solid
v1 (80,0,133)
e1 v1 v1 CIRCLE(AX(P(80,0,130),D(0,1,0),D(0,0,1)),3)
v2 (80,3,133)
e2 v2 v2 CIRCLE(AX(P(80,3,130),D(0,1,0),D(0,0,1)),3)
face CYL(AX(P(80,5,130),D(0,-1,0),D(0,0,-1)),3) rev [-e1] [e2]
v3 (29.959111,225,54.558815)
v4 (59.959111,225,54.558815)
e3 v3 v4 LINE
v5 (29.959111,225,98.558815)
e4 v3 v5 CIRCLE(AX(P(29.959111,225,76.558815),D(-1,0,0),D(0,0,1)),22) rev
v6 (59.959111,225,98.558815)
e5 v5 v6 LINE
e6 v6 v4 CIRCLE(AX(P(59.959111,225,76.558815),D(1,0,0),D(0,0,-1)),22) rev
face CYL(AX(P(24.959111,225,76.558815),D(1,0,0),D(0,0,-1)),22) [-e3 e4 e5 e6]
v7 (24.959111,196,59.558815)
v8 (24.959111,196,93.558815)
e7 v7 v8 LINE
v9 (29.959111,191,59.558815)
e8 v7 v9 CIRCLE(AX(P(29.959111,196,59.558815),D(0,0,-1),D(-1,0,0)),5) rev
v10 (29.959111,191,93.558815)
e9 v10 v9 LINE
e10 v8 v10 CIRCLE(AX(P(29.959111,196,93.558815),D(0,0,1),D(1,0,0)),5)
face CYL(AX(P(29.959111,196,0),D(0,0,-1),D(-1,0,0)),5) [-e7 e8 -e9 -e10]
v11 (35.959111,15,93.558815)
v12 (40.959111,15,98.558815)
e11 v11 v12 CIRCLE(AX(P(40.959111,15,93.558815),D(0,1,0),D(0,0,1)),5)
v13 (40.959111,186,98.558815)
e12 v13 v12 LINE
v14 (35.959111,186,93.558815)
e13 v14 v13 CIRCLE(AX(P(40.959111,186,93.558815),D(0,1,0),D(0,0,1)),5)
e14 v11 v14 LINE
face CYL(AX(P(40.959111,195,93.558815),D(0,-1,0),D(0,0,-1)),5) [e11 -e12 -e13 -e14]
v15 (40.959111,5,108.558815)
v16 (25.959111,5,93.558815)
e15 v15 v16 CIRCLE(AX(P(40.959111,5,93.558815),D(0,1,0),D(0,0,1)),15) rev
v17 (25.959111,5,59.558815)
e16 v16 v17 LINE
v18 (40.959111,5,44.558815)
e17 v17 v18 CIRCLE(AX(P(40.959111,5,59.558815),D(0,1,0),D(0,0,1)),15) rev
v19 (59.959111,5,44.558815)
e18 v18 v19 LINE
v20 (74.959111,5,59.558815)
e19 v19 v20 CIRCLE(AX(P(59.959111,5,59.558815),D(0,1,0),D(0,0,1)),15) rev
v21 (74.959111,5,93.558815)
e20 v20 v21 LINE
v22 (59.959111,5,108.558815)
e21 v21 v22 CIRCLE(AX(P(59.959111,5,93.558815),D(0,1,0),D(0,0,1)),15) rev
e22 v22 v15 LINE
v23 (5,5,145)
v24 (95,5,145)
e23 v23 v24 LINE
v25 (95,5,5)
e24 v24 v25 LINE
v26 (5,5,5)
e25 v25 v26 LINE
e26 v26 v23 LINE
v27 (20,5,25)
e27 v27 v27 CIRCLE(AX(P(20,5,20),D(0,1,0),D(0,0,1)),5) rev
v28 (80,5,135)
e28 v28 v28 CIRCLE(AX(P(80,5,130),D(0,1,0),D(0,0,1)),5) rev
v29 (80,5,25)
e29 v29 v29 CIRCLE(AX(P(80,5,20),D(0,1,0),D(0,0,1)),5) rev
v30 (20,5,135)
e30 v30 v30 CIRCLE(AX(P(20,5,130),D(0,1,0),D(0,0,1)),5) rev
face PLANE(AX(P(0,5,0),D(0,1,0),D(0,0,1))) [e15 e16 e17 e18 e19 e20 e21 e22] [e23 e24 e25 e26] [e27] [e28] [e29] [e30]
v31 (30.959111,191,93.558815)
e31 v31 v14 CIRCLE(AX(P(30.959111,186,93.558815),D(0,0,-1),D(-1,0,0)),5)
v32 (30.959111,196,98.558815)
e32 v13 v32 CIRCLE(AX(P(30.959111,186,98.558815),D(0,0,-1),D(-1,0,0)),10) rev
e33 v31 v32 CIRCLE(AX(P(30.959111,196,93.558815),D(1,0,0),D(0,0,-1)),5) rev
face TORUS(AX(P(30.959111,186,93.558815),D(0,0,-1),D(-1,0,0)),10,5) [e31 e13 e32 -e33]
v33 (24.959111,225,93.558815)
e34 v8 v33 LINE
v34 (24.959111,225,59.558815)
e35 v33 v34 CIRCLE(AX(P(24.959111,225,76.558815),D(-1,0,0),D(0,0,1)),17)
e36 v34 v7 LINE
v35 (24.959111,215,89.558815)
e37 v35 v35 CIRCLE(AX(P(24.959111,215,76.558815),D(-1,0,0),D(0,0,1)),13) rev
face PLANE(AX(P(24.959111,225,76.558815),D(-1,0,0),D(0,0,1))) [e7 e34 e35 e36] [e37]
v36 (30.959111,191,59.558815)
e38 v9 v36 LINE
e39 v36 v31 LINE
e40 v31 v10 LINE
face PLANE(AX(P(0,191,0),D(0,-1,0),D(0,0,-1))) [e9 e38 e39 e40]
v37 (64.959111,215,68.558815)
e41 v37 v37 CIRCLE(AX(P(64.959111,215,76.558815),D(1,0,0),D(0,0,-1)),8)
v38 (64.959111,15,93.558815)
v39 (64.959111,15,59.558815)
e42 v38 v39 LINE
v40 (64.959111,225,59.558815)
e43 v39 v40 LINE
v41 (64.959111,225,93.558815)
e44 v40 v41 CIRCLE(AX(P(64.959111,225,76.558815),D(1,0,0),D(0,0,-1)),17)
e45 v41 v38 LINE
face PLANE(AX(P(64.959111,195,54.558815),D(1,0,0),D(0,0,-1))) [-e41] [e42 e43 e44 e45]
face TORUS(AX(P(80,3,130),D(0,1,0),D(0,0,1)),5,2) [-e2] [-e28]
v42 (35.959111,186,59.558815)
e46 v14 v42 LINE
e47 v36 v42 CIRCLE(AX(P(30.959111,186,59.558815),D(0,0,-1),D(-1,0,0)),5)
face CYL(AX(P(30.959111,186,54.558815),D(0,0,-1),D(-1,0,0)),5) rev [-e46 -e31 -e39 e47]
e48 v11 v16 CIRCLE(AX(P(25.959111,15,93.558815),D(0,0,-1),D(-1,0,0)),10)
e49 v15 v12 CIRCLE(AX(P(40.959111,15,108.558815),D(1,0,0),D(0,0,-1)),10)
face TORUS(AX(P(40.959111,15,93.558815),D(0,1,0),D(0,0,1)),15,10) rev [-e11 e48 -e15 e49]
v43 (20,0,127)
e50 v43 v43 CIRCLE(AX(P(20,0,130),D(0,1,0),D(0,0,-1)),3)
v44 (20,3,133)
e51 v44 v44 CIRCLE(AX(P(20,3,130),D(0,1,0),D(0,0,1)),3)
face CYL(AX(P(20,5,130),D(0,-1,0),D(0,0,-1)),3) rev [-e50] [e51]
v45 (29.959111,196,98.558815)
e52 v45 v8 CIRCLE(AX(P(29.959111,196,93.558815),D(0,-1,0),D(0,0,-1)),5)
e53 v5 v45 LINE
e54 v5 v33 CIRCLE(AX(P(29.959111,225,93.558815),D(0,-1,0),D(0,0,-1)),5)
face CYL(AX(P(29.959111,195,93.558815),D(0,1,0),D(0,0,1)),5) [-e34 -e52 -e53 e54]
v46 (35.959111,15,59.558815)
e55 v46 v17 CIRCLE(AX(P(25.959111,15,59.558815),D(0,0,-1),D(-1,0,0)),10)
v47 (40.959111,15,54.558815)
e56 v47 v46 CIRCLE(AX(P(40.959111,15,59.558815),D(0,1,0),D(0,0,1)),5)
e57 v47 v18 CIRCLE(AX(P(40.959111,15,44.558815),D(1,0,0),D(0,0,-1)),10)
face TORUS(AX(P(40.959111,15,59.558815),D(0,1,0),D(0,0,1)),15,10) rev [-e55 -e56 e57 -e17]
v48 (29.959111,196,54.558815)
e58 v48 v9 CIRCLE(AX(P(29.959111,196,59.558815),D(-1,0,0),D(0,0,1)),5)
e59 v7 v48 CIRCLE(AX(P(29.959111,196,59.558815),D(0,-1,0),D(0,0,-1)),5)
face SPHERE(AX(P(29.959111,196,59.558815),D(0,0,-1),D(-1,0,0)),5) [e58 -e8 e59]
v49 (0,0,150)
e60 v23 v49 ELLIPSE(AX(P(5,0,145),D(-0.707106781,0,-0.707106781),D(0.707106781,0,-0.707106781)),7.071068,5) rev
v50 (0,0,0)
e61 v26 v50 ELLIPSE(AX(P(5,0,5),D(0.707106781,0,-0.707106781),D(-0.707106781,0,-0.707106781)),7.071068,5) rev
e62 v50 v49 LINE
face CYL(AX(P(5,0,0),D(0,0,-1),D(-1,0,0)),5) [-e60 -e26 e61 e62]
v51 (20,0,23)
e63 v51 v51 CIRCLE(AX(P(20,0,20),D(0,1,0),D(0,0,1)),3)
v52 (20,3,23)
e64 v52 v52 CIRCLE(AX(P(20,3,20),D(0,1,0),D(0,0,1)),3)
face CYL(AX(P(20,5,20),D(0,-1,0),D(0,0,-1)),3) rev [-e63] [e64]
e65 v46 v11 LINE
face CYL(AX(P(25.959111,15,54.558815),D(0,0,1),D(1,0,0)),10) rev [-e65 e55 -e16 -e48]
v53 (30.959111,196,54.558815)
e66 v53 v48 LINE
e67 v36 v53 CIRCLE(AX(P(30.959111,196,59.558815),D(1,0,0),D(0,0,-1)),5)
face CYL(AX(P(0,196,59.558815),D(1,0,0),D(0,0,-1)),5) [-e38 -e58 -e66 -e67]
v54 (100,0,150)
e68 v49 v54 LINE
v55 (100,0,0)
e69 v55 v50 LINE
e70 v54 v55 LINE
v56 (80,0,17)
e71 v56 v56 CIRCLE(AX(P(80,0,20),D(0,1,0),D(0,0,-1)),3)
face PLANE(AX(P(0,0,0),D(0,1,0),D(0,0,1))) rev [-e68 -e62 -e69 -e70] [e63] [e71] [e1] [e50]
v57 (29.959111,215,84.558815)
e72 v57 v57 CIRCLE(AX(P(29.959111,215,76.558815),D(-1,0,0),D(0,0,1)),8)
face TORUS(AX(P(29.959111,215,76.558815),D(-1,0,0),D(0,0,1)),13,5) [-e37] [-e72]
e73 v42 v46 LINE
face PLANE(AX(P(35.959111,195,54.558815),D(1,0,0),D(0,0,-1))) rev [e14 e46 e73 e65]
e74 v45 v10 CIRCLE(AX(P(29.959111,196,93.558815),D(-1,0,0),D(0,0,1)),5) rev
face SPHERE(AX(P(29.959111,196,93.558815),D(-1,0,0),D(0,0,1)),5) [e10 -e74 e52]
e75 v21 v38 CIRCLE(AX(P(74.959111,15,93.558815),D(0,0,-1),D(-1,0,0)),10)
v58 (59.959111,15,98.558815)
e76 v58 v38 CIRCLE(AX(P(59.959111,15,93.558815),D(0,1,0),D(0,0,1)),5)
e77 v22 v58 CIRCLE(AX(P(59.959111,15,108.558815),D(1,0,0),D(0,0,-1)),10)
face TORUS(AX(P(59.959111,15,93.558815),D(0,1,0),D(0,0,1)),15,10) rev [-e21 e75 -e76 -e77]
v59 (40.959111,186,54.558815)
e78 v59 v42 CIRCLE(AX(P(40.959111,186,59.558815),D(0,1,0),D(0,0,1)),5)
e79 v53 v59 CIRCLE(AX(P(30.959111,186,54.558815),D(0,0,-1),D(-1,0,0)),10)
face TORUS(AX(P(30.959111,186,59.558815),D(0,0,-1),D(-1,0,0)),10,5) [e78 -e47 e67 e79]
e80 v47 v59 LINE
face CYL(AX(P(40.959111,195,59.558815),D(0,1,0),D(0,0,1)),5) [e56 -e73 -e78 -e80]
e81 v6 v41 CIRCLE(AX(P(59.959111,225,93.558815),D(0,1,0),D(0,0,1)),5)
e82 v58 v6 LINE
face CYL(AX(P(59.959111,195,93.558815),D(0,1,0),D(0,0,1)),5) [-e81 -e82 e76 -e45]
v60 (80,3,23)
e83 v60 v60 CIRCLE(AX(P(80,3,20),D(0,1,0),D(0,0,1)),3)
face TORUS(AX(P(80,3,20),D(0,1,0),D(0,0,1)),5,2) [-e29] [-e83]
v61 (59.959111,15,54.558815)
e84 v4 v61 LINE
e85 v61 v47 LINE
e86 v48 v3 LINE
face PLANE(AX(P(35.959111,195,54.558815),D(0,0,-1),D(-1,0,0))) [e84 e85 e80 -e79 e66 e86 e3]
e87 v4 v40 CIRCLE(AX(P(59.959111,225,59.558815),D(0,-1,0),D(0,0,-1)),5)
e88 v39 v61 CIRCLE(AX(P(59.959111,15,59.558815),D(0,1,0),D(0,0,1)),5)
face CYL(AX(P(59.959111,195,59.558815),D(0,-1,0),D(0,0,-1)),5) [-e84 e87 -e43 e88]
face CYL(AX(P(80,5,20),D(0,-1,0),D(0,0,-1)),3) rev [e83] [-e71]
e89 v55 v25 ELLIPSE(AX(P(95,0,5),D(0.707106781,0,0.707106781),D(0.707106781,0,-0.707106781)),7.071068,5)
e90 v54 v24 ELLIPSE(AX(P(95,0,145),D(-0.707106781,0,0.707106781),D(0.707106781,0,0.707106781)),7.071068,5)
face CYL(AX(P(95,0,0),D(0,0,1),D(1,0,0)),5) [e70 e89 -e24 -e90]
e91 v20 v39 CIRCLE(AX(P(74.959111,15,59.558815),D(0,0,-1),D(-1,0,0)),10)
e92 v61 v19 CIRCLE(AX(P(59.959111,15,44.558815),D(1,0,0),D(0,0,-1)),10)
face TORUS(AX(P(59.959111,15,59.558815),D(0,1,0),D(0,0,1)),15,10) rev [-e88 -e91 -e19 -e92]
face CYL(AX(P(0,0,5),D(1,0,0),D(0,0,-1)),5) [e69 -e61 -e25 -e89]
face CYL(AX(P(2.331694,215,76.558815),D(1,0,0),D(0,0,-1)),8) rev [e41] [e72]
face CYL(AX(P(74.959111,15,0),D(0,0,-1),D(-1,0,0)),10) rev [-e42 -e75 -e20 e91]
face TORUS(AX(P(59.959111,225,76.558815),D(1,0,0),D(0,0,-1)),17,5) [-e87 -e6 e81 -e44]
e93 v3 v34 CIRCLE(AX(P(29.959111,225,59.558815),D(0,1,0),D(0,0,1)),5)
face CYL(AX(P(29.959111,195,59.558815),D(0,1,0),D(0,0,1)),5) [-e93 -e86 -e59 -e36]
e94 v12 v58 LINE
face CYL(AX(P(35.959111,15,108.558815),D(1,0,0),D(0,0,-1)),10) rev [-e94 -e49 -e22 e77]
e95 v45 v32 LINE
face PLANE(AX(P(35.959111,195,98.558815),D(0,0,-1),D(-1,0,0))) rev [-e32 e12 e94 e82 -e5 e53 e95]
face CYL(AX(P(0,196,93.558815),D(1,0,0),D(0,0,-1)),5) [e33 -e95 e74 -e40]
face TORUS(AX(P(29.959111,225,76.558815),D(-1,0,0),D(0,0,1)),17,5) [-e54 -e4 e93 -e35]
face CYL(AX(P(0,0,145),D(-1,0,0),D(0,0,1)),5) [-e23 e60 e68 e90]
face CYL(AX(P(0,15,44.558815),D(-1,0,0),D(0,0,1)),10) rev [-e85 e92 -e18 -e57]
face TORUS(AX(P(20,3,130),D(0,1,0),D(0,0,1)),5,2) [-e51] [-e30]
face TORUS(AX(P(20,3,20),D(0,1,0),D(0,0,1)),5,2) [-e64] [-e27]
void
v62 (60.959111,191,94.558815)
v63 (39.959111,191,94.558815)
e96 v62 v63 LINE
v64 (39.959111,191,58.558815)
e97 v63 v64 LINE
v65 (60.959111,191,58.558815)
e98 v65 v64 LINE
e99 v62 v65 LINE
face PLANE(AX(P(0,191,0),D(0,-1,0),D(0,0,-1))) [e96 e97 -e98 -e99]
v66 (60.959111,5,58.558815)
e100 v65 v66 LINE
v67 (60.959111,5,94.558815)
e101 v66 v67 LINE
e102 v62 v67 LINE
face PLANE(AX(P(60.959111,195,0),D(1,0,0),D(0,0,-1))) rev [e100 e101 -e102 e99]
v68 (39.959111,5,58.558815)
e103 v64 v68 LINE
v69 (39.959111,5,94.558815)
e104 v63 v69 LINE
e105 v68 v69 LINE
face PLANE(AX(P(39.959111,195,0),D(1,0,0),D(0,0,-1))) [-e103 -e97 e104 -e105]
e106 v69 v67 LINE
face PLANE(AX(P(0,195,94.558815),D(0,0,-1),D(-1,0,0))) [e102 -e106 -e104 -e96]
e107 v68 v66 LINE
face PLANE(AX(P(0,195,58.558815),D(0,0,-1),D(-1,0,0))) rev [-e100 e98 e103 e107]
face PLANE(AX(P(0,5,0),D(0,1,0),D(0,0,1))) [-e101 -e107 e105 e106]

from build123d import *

# Parameters (mm, degrees)
SKETCH1_W           = 100
SKETCH1_H           = 150
SKETCH1_R           = 3
BOTTOM_DEPTH        = 5
SKETCH2_W           = 29
SKETCH2_H           = 44
SKETCH2_W_2         = 21
SKETCH2_H_2         = 36
BOSS_EXTRUDE2_DEPTH = 190
BOSS_EXTRUDE3_DEPTH = 40
SKETCH4_R           = 8
CUT_EXTRUDE1_DEPTH  = 40
SKETCH5_W           = 40
SKETCH5_H           = 44
BOSS_EXTRUDE4_DEPTH = 4
FILLET1_R           = 5
FILLET2_R           = 5
FILLET3_R           = 10
FILLET4_R           = 5
FILLET5_R           = 2


with BuildPart() as part:
    # Sketch1 → bottom (new body)
    with BuildSketch(Plane(origin=(0, 0, 0), x_dir=(1, 0, 0), z_dir=(0, 1, 0))):
        with Locations((50, -75)):
            Rectangle(SKETCH1_W, SKETCH1_H)
        with Locations(Location((20, -20, 0), (0, 0, 270))):
            Circle(SKETCH1_R, mode=Mode.SUBTRACT)
        with Locations(Location((80, -20, 0), (0, 0, 90))):
            Circle(SKETCH1_R, mode=Mode.SUBTRACT)
        with Locations(Location((80, -130, 0), (0, 0, 270))):
            Circle(SKETCH1_R, mode=Mode.SUBTRACT)
        with Locations(Location((20, -130, 0), (0, 0, 90))):
            Circle(SKETCH1_R, mode=Mode.SUBTRACT)
    extrude(amount=BOTTOM_DEPTH)

    # Sketch2 → Boss-Extrude2 (add)
    with BuildSketch(Plane(origin=(0, 5, 0), x_dir=(1, 0, 0), z_dir=(0, 1, 0))):
        with Locations((50.459110832, -76.558815358)):
            Rectangle(SKETCH2_W, SKETCH2_H)
        with Locations((50.459110832, -76.558815358)):
            Rectangle(SKETCH2_W_2, SKETCH2_H_2, mode=Mode.SUBTRACT)
    extrude(amount=BOSS_EXTRUDE2_DEPTH)

    # Sketch3 → Boss-Extrude3 (add)
    with BuildSketch(Plane(origin=(64.959110832, 0, 0), x_dir=(0, 0, -1), z_dir=(1, 0, 0))):
        with BuildLine():
            Line((-98.558815358, 195), (-98.558815358, 225))
            ThreePointArc((-98.558815358, 225), (-76.558815358, 247), (-54.558815358, 225))
            Line((-54.558815358, 225), (-54.558815358, 195))
            Line((-54.558815358, 195), (-98.558815358, 195))
        make_face()
    extrude(amount=-BOSS_EXTRUDE3_DEPTH)

    # Sketch4 → Cut-Extrude1 (cut)
    with BuildSketch(Plane(origin=(64.959110832, 0, 0), x_dir=(0, 0, -1), z_dir=(1, 0, 0))):
        with Locations((-76.558815358, 215)):
            Circle(SKETCH4_R)
    extrude(amount=-CUT_EXTRUDE1_DEPTH, mode=Mode.SUBTRACT)

    # Sketch5 → Boss-Extrude4 (add)
    with BuildSketch(Plane.XZ.offset(-195)):
        with Locations((44.959110832, 76.558815358)):
            Rectangle(SKETCH5_W, SKETCH5_H)
    extrude(amount=BOSS_EXTRUDE4_DEPTH)

    # Fillet1
    fillet1_edges = [part.edges().sort_by_distance(p)[0] for p in [
        (24.959110832, 208, 98.558815358),
        (24.959110832, 247, 76.558815358),
        (24.959110832, 208, 54.558815358),
        (24.959110832, 215, 84.558815358),
        (35.959110832, 98, 98.558815358),
        (35.959110832, 98, 54.558815358),
        (30.459110832, 191, 98.558815358),
        (24.959110832, 191, 76.558815358),
        (30.459110832, 191, 54.558815358),
        (35.959110832, 191, 76.558815358),
    ]]
    fillet(fillet1_edges, radius=FILLET1_R)

    # Fillet2
    fillet2_edges = [part.edges().sort_by_distance(p)[0] for p in [
        (64.959110832, 115, 54.558815358),
        (64.959110832, 115, 98.558815358),
        (64.959110832, 247, 76.558815358),
    ]]
    fillet(fillet2_edges, radius=FILLET2_R)

    # Fillet3
    fillet3_edges = [part.edges().sort_by_distance(p)[0] for p in [
        (50.459110832, 5, 98.558815358),
        (50.459110832, 5, 54.558815358),
        (35.959110832, 5, 76.558815358),
        (37.423576926, 5, 97.094349264),
        (37.423576926, 5, 56.023281452),
        (64.959110832, 5, 76.558815358),
        (63.494644738, 5, 56.023281452),
        (63.494644738, 5, 97.094349264),
    ]]
    fillet(fillet3_edges, radius=FILLET3_R)

    # Fillet4
    fillet4_edges = [part.edges().sort_by_distance(p)[0] for p in [
        (50, 5, 150),
        (100, 5, 75),
        (50, 5, 0),
        (0, 5, 75),
    ]]
    fillet(fillet4_edges, radius=FILLET4_R - 0.0001)  # a hair under: the kernel refuses the full size

    # Fillet5
    fillet5_edges = [part.edges().sort_by_distance(p)[0] for p in [
        (20, 5, 17),
        (80, 5, 23),
        (80, 5, 127),
        (20, 5, 133),
    ]]
    fillet(fillet5_edges, radius=FILLET5_R)


solid = part.part
